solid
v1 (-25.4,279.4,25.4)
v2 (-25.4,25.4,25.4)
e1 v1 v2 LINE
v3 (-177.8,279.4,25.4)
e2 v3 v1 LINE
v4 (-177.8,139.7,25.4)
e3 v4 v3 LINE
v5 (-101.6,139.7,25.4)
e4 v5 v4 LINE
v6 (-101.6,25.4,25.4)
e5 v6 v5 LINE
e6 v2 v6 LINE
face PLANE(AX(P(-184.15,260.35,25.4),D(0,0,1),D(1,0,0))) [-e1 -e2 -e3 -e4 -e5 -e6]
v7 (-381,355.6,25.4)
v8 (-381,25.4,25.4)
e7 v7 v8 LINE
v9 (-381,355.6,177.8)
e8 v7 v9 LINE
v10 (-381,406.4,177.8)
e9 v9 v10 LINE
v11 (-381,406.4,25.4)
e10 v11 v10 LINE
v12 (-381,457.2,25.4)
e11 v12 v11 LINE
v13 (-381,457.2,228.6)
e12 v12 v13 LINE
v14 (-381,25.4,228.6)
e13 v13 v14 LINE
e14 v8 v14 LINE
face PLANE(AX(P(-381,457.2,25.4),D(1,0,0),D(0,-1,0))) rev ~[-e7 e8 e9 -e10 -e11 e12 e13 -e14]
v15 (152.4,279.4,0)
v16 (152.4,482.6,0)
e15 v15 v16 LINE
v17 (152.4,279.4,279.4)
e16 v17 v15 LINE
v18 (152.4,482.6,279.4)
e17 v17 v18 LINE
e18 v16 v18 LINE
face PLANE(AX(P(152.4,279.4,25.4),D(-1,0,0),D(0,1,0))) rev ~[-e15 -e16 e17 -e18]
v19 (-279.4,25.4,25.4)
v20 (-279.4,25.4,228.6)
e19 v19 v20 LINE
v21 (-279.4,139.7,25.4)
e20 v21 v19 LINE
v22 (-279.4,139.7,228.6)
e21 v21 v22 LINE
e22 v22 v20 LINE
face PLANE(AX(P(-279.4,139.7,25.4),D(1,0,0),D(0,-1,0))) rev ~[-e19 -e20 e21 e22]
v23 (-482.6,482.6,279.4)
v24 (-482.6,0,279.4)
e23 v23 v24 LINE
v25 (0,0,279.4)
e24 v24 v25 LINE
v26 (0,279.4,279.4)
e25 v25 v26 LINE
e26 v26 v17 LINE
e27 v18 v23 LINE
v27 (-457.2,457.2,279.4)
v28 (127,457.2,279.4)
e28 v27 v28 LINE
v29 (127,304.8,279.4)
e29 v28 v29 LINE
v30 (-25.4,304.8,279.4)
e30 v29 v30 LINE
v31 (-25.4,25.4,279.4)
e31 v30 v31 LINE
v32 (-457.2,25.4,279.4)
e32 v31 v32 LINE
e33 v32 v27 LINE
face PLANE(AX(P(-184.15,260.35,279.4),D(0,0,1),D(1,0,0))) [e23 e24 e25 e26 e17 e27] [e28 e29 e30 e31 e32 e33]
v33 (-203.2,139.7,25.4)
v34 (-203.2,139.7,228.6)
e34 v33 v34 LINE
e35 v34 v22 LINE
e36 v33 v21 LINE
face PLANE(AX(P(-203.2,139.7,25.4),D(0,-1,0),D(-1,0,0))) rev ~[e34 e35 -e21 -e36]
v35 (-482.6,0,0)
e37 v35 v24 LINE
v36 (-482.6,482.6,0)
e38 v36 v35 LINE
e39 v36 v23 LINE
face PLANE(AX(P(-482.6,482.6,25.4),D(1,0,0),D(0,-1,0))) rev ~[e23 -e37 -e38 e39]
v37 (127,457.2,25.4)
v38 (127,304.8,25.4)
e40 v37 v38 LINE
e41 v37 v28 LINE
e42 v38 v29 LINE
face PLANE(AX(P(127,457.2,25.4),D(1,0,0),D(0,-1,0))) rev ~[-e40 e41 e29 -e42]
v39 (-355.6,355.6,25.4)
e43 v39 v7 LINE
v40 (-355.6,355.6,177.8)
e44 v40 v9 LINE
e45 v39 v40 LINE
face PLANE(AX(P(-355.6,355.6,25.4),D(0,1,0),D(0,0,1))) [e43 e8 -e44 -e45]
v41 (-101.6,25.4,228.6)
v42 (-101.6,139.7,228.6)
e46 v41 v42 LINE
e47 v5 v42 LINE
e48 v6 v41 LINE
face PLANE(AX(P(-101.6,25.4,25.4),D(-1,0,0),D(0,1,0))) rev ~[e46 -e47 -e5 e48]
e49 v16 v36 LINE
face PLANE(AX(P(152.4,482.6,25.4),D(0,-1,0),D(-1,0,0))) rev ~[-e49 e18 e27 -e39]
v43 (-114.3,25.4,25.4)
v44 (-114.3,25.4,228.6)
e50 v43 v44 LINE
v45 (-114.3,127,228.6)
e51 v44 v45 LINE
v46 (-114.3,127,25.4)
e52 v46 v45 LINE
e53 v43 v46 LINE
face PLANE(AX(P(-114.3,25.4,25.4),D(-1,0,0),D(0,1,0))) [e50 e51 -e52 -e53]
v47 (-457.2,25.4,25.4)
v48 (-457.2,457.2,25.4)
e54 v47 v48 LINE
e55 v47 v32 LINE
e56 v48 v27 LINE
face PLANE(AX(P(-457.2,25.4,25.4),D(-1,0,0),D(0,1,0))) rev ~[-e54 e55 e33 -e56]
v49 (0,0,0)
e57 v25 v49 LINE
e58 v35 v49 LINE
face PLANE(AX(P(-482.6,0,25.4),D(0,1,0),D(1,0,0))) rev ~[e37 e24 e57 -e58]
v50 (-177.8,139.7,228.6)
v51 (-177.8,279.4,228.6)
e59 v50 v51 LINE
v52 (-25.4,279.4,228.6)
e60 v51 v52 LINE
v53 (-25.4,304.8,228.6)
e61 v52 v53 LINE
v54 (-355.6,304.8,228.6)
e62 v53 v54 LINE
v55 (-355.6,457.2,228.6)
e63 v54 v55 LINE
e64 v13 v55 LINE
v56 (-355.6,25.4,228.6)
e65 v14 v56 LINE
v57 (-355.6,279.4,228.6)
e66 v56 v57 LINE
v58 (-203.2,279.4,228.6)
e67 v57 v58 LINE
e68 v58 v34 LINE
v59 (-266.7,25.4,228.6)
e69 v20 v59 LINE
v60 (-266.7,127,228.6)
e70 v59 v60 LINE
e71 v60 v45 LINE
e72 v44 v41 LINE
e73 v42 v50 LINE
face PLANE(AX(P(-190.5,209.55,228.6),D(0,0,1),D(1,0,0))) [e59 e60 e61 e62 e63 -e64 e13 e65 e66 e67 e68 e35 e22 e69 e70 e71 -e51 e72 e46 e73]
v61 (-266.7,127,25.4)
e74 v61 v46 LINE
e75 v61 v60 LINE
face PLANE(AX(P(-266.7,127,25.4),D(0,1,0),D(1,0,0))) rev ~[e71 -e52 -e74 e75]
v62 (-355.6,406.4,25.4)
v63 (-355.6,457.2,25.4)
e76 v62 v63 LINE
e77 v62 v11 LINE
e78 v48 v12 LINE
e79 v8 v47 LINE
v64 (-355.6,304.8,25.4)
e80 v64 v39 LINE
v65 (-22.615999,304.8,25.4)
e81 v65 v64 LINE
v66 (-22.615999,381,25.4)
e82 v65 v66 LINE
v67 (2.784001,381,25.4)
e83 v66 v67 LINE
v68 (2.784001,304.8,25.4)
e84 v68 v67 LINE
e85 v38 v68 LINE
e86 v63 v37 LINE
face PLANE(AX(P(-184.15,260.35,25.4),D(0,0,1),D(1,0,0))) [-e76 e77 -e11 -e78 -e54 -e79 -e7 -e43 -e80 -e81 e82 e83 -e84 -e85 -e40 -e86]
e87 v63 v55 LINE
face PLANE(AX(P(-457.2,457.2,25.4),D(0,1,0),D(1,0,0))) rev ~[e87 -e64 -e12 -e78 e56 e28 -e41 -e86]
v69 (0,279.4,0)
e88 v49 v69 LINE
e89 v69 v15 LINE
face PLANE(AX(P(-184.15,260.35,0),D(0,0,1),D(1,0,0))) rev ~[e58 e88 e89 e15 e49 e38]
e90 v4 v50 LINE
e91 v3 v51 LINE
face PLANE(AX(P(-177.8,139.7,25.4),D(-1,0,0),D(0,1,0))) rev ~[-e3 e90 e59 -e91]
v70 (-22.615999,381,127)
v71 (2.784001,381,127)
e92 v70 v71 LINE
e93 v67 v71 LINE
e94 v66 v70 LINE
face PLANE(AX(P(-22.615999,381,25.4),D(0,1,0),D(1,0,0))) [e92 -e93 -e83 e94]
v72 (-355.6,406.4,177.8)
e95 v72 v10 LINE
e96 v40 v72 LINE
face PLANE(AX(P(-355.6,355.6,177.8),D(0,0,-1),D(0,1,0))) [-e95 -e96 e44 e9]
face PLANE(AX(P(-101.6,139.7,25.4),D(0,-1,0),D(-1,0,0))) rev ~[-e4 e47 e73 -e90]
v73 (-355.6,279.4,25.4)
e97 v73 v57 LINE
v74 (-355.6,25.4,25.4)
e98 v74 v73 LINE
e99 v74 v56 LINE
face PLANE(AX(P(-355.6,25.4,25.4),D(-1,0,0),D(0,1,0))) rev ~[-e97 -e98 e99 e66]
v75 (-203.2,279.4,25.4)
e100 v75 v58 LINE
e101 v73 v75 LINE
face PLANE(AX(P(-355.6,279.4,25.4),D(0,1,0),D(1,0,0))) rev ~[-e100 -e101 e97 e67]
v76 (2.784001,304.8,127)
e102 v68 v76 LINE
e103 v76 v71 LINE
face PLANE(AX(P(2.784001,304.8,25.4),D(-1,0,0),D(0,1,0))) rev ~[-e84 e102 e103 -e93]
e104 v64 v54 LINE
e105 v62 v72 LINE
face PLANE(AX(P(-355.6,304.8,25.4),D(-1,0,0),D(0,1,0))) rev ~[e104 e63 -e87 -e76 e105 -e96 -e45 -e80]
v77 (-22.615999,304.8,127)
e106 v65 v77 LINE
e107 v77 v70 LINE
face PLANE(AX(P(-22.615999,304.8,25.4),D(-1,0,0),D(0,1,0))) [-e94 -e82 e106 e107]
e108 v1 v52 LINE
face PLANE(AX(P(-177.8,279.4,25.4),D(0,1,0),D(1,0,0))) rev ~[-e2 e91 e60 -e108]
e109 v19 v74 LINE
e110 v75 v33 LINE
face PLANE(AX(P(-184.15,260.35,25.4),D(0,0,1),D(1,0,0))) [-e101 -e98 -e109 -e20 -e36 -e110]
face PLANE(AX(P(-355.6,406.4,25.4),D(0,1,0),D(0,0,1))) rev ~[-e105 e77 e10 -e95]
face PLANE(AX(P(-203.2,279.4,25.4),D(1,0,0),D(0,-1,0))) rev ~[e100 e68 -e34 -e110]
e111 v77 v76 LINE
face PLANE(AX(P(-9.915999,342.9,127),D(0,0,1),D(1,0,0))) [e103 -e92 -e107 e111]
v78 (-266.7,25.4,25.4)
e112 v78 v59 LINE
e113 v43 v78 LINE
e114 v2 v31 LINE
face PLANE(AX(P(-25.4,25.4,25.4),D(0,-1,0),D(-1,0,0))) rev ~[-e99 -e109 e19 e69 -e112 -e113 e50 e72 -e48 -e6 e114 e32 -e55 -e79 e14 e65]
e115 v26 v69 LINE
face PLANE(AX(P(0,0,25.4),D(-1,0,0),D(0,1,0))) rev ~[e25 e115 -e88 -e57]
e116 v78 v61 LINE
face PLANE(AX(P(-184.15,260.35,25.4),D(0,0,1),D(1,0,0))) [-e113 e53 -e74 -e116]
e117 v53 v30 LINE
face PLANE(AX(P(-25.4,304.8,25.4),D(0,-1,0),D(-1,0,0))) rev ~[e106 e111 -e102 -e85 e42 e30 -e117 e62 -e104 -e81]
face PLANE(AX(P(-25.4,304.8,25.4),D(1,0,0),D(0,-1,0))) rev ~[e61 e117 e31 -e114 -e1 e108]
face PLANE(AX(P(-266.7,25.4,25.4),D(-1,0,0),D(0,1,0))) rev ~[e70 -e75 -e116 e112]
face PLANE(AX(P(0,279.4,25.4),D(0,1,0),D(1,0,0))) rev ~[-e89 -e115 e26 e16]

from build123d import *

# Parameters (mm, degrees)
F1_DEPTH = 25.4
F3_DEPTH = 254
F4_W     = 25.4
F4_H     = 139.7
F4_H_2   = 25.4
F4_H_3   = 12.7
F4_W_2   = 63.5
F4_W_3   = 12.7
F4_H_4   = 254
F4_H_5   = 152.4
F4_H_6   = 101.6
F5_DEPTH = 203.2
F6_W     = 25.4
F6_H     = 76.2
F7_DEPTH = 101.6
F8_W     = 50.8
F8_H     = 152.4
F9_DEPTH = 25.4


with BuildPart() as f1:
    # F0 (on Top) → F1 (new body)
    with BuildSketch(Plane.XY):
        Polygon((-482.6, 0), (0, 0), (0, 279.4), (152.4, 279.4), (152.4, 482.6), (-482.6, 482.6), align=None)
    extrude(amount=F1_DEPTH)

    # F2 (on face) → F3 (join)
    with BuildSketch(Plane.XY.offset(25.4)):
        Polygon((152.4, 279.4), (152.4, 482.6), (-482.6, 482.6), (-482.6, 0), (0, 0), (0, 279.4), align=None)
        Polygon((-25.4, 25.4), (-457.2, 25.4), (-457.2, 457.2), (127, 457.2), (127, 304.8), (-25.4, 304.8), align=None, mode=Mode.SUBTRACT)
    extrude(amount=F3_DEPTH)

    # F4 (on face) → F5 (join)
    with BuildSketch(Plane.XY.offset(25.4)):
        with Locations((-190.5, 209.55)):
            Rectangle(F4_W, F4_H)
        with Locations((-368.3, 292.1)):
            Rectangle(F4_W, F4_H_2)
        with Locations((-190.5, 133.35)):
            Rectangle(F4_W, F4_H_3)
        with Locations((-234.95, 133.35)):
            Rectangle(F4_W_2, F4_H_3)
        with Locations((-146.05, 133.35)):
            Rectangle(F4_W_2, F4_H_3)
        with Locations((-273.05, 133.35)):
            Rectangle(F4_W_3, F4_H_3)
        with Locations((-107.95, 133.35)):
            Rectangle(F4_W_3, F4_H_3)
        with Locations((-368.3, 152.4)):
            Rectangle(F4_W, F4_H_4)
        Polygon((-355.6, 304.8), (-355.6, 279.4), (-203.2, 279.4), (-177.8, 279.4), (-25.4, 279.4), (-25.4, 304.8), align=None)
        with Locations((-368.3, 381)):
            Rectangle(F4_W, F4_H_5)
        with Locations((-107.95, 76.2)):
            Rectangle(F4_W_3, F4_H_6)
        with Locations((-273.05, 76.2)):
            Rectangle(F4_W_3, F4_H_6)
    extrude(amount=F5_DEPTH)

    # F6 (on face) → F7 (join)
    with BuildSketch(Plane.XY.offset(25.4)):
        with Locations((-9.9159989834, 342.9)):
            Rectangle(F6_W, F6_H)
    extrude(amount=F7_DEPTH)

    # F8 (on face) → F9 (cut)
    with BuildSketch(Plane.YZ.offset(-355.6)):
        with Locations((381, 101.6)):
            Rectangle(F8_W, F8_H)
    extrude(amount=-F9_DEPTH, mode=Mode.SUBTRACT)


solid = f1.part
